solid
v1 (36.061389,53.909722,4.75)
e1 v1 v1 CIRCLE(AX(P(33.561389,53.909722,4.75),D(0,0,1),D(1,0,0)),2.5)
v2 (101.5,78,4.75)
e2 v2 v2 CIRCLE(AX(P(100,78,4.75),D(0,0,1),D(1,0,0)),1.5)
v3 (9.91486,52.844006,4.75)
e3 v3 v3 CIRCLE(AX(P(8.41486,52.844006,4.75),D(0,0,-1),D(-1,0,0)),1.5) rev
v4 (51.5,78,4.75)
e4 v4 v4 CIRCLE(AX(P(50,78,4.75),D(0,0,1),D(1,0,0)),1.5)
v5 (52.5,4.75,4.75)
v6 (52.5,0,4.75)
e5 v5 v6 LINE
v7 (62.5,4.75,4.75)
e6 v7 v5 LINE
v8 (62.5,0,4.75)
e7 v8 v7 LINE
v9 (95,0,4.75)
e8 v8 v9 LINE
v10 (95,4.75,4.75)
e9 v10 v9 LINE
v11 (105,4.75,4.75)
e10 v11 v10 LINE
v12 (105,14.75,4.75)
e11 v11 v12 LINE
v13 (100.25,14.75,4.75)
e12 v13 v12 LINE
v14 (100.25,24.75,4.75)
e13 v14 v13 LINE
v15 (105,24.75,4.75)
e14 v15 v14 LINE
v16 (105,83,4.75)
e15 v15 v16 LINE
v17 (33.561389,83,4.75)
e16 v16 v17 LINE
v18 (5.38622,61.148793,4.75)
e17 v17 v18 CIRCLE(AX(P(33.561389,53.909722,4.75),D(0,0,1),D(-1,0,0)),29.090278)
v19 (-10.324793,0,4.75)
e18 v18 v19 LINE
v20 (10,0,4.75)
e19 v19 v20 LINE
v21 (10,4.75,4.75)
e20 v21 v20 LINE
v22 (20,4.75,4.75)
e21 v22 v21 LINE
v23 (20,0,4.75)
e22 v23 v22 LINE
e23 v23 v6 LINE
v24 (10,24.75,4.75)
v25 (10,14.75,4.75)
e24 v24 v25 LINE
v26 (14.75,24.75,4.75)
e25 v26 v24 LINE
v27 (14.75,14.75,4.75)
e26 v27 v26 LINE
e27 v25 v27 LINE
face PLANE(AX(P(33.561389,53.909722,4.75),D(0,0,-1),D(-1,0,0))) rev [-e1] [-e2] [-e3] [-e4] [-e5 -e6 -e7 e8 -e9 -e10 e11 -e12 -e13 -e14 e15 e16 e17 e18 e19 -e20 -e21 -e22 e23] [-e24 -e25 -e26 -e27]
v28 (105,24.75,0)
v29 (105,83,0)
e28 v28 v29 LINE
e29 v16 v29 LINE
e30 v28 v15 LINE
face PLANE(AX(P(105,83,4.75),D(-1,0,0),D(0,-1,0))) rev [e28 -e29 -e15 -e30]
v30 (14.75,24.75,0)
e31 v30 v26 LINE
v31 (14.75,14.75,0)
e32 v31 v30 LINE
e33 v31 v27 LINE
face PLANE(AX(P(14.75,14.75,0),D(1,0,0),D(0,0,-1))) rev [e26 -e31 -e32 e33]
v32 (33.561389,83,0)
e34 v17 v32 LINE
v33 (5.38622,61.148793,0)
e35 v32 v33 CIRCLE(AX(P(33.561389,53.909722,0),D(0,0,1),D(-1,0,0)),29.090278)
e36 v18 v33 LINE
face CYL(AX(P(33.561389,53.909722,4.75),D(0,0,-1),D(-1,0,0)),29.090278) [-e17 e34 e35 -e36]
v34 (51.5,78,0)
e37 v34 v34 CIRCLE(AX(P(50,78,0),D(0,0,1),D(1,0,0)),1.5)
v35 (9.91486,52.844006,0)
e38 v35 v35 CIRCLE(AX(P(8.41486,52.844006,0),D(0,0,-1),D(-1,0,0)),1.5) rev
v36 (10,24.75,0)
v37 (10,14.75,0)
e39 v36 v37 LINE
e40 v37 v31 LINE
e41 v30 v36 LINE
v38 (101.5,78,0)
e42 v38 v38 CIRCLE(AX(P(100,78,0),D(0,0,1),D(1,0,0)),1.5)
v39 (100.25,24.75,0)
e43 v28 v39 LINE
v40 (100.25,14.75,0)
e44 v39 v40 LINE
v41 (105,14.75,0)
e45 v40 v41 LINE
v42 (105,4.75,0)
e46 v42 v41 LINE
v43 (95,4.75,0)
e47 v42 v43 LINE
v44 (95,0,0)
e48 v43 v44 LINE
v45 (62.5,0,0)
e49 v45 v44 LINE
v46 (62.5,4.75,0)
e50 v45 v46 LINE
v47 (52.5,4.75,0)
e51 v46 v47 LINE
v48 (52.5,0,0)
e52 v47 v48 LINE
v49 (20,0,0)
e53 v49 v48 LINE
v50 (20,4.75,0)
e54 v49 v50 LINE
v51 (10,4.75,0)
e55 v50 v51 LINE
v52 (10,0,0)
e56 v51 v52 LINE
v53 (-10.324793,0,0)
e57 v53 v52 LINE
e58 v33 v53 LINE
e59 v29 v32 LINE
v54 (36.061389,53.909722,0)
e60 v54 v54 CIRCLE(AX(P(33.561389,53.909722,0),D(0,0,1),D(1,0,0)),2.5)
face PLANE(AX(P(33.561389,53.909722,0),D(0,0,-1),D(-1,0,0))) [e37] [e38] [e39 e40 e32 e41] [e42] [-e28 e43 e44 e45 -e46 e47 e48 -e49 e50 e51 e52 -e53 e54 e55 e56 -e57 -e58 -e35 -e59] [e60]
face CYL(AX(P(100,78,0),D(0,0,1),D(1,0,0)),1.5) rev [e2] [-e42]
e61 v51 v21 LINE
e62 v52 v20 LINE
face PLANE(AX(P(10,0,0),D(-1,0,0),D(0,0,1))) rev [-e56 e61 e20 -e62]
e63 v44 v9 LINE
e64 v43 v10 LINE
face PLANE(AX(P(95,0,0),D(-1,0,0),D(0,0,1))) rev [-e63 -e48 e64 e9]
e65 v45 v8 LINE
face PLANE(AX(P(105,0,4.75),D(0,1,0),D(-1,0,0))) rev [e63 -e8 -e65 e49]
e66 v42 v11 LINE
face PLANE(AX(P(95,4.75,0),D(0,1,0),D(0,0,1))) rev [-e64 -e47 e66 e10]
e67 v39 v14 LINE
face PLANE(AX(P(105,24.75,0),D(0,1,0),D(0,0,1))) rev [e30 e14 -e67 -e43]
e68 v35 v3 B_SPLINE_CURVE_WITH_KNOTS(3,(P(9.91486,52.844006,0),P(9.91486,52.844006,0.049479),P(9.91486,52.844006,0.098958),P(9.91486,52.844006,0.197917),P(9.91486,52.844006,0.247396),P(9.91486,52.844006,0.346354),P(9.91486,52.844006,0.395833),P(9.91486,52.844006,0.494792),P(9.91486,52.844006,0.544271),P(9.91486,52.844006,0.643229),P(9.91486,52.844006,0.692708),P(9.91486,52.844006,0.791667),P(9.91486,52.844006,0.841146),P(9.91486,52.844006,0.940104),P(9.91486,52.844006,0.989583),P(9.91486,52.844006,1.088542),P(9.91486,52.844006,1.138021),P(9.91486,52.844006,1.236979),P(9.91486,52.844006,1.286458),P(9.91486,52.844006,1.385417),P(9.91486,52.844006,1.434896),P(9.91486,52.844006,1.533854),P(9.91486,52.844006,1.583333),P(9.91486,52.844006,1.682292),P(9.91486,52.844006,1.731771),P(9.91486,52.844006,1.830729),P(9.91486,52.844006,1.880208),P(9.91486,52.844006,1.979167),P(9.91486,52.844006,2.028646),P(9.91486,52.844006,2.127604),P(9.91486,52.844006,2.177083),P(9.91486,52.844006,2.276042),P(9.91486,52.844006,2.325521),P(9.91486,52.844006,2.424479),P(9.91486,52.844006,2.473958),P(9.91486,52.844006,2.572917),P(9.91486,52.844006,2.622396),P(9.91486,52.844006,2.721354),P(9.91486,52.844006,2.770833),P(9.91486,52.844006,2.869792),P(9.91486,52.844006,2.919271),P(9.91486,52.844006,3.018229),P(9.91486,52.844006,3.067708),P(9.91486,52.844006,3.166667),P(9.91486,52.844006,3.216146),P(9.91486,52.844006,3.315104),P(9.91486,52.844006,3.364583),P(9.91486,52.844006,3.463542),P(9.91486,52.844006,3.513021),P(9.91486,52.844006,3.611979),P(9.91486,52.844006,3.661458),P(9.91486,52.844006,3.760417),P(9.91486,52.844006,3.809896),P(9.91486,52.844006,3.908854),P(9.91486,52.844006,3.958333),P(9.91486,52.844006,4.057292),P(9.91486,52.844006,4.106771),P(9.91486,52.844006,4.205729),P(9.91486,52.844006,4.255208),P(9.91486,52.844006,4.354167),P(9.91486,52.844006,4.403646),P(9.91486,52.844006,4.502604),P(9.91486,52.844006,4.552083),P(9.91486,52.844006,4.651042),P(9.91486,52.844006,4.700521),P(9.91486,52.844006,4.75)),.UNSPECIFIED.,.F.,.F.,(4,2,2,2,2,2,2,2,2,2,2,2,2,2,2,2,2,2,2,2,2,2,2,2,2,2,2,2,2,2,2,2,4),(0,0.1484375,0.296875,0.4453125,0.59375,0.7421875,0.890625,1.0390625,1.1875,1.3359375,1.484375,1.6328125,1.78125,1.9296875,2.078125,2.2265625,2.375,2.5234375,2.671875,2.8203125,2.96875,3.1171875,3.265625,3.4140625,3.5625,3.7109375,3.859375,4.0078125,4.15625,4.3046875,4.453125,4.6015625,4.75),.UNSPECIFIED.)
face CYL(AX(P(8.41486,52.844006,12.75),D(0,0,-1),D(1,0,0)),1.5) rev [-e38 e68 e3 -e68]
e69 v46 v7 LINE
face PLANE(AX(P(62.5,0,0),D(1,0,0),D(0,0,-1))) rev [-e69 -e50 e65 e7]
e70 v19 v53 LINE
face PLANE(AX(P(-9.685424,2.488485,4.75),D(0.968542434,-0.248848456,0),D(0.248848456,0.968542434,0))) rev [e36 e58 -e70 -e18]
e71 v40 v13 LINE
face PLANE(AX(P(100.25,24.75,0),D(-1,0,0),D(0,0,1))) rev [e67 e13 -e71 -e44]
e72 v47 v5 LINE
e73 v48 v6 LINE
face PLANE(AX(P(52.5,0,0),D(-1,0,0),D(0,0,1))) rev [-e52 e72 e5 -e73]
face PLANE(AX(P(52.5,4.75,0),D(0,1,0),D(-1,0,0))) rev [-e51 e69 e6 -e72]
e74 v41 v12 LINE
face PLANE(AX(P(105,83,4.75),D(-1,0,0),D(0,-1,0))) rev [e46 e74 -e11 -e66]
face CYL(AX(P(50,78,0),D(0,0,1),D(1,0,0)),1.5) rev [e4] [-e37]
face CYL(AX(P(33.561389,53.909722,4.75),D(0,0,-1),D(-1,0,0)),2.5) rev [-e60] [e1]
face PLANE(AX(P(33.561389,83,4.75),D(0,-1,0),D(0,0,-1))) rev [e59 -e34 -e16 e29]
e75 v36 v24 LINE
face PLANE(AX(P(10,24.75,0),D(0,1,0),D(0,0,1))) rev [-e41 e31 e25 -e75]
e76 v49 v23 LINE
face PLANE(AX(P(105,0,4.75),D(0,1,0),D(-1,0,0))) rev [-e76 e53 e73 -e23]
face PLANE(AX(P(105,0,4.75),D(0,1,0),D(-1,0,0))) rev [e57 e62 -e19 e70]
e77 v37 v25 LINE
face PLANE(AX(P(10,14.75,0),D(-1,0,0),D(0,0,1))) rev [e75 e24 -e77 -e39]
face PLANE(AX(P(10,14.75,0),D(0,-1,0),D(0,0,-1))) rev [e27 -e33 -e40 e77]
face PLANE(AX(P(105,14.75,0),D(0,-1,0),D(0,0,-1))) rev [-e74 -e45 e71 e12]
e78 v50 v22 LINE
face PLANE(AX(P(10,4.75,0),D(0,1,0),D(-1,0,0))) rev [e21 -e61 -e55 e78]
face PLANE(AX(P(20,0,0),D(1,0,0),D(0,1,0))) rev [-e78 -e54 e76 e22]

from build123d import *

# Parameters (mm, degrees)
SKETCH1_R           = 2.5
BOSS_EXTRUDE1_DEPTH = 4.75
SKETCH2_W           = 10
SKETCH2_H           = 4.75
SKETCH2_W_2         = 4.75
SKETCH2_H_2         = 10
CUT_EXTRUDE1_DEPTH  = 134.927452376
SKETCH3_R           = 1.5
CUT_EXTRUDE2_DEPTH  = 134.927452376
CAVITY1_OUTLINE_R   = 1.5
CAVITY1_DEPTH       = 4.75


# Read off the part's stored shape, not the designer's step: Cavity1
with BuildPart() as part:
    # Sketch1 → Boss-Extrude1 (new body)
    with BuildSketch(Plane.XY):
        with BuildLine():
            Line((-9.685424338, 2.488484559), (5.386220056, 61.148792841))
            ThreePointArc((5.386220056, 61.148792841), (15.733633721, 76.897010412), (33.561388608, 83))
            Line((33.561388608, 83), (105, 83))
            Line((105, 83), (105, 0))
            Line((105, 0), (-10.324792855, 0))
            Line((-10.324792855, 0), (-9.685424338, 2.488484559))
        make_face()
        with Locations((33.561388608, 53.909722104)):
            Circle(SKETCH1_R, mode=Mode.SUBTRACT)
    extrude(amount=BOSS_EXTRUDE1_DEPTH)

    # Sketch2 → Cut-Extrude1 (cut, through all)
    with BuildSketch(Plane.XY.offset(4.75)):
        with Locations((15, 2.375)):
            Rectangle(SKETCH2_W, SKETCH2_H)
        with Locations((57.5, 2.375)):
            Rectangle(SKETCH2_W, SKETCH2_H)
        with Locations((100, 2.375)):
            Rectangle(SKETCH2_W, SKETCH2_H)
        with Locations((102.625, 19.75)):
            Rectangle(SKETCH2_W_2, SKETCH2_H_2)
        with Locations((12.375, 19.75)):
            Rectangle(SKETCH2_W_2, SKETCH2_H_2)
    extrude(amount=-CUT_EXTRUDE1_DEPTH, mode=Mode.SUBTRACT)

    # Sketch3 → Cut-Extrude2 (cut, through all)
    with BuildSketch(Plane.XY.offset(4.75)):
        with Locations((50, 78)):
            Circle(SKETCH3_R)
        with Locations((100, 78)):
            Circle(SKETCH3_R)
    extrude(amount=-CUT_EXTRUDE2_DEPTH, mode=Mode.SUBTRACT)

    # Cavity1 outline → Cavity1 (cut)
    with BuildSketch(Plane.XY):
        with Locations((8.414860226, 52.844005614)):
            Circle(CAVITY1_OUTLINE_R)
    extrude(amount=CAVITY1_DEPTH, mode=Mode.SUBTRACT)


solid = part.part
